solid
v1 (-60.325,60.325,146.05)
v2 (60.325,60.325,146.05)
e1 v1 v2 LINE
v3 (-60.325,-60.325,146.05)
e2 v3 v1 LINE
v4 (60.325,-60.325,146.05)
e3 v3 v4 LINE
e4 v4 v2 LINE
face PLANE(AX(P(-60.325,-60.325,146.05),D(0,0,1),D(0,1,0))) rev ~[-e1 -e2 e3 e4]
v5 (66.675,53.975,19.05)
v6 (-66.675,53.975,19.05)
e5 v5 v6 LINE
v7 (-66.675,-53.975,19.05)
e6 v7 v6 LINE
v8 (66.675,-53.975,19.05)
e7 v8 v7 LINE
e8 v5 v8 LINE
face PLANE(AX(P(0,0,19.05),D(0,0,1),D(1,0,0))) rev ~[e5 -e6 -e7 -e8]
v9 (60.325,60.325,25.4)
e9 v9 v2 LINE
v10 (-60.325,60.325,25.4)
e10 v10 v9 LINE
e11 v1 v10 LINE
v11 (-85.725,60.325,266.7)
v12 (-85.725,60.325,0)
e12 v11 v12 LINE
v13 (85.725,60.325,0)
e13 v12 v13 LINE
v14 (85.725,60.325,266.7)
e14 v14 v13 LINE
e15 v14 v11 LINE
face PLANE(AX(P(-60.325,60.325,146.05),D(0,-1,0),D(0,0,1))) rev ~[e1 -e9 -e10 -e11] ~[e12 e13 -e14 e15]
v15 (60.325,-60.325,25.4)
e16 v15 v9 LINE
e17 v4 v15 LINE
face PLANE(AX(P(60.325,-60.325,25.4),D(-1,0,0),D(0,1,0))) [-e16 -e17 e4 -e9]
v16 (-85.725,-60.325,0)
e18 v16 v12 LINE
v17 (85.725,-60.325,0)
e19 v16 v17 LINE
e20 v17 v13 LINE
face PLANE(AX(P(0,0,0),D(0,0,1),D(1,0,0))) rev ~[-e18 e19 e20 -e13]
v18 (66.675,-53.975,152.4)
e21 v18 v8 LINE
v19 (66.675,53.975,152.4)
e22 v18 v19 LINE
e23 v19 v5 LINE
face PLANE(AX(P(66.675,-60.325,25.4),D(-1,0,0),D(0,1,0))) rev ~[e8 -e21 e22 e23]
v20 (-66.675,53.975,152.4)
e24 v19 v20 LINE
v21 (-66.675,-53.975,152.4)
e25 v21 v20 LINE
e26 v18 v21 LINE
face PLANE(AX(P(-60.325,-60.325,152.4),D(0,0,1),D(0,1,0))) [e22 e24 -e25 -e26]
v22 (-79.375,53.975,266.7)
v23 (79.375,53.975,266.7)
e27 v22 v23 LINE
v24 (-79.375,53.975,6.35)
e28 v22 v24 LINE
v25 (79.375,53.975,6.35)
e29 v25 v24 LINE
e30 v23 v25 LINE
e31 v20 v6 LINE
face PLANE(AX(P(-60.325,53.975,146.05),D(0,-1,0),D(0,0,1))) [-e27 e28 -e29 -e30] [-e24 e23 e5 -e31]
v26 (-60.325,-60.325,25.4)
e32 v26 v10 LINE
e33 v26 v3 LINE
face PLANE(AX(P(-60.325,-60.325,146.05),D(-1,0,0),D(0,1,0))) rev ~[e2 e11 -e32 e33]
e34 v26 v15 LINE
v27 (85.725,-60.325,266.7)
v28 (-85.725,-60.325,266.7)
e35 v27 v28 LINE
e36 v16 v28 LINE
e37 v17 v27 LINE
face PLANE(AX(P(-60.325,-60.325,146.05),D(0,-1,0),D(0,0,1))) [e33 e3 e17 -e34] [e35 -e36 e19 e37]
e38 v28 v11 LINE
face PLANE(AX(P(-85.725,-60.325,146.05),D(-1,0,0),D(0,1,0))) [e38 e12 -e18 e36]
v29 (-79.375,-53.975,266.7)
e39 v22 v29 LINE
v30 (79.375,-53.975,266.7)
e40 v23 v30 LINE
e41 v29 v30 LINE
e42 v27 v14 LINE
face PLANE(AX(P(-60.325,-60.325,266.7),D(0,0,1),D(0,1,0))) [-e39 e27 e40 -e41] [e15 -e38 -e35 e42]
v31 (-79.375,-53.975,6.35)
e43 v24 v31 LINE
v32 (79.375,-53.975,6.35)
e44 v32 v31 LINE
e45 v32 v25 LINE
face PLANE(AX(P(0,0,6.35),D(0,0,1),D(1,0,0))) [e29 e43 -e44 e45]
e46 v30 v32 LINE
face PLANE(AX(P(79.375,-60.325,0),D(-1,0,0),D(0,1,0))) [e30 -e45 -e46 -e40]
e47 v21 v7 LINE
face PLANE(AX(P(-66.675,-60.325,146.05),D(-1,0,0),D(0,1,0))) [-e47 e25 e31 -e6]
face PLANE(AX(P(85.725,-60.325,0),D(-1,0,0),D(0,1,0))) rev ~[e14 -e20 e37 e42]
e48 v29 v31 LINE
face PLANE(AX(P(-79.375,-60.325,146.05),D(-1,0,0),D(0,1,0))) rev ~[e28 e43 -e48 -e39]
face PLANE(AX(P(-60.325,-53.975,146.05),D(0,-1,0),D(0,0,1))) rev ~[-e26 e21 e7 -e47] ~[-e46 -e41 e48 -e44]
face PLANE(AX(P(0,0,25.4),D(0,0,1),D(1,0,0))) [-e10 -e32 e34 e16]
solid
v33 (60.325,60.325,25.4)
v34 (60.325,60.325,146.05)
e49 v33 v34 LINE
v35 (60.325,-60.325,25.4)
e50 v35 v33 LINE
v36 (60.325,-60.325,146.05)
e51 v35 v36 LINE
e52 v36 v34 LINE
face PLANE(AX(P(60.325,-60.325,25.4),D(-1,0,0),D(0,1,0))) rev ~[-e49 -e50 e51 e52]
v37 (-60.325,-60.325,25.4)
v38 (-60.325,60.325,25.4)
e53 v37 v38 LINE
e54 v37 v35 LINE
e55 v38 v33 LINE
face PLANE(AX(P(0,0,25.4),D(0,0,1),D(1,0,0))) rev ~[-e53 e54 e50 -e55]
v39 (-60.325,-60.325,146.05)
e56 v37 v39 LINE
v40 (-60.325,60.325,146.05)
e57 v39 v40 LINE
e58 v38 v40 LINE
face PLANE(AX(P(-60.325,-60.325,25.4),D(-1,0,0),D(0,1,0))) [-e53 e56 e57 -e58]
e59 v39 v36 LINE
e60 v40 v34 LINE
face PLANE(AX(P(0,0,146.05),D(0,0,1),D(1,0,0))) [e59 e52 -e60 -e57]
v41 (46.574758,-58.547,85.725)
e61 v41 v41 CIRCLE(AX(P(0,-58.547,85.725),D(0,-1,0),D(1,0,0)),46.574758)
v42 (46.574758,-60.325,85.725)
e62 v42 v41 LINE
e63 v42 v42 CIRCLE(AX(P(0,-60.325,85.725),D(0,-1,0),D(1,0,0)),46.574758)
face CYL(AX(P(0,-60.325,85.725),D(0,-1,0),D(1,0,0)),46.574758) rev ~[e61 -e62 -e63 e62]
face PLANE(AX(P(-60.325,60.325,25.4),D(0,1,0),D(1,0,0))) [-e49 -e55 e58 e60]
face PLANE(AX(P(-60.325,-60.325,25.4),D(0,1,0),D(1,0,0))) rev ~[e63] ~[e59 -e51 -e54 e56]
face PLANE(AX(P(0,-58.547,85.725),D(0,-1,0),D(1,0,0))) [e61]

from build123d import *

# Parameters (mm, degrees)
F0_W      = 120.65
F0_H      = 120.65
F1_DEPTH  = 120.65
F2_R      = 46.5747584451
F3_DEPTH  = 1.778
F5_W      = 171.45
F5_H      = 120.65
F6_DEPTH  = 25.4
F7_W      = 25.4
F7_H      = 120.65
F8_DEPTH  = 120.65
F9_DEPTH  = 120.65
F10_W     = 120.65
F10_H     = 120.65
F11_DEPTH = 120.65
F12_T     = -6.35


with BuildPart() as f1:
    # F0 (on Top) → F1 (new body)
    with BuildSketch(Plane.XY):
        Rectangle(F0_W, F0_H)
    extrude(amount=F1_DEPTH)

    # F2 (on face) → F3 (cut)
    with BuildSketch(Plane.XZ.offset(60.325)):
        with Locations((0, 60.325)):
            Circle(F2_R)
    extrude(amount=-F3_DEPTH, mode=Mode.SUBTRACT)


with BuildPart() as f1_1:
    # F4: moved
    add(f1.part.moved(Location((0, 0, 25.4))))


with BuildPart() as f6:
    # F5 (on Top) → F6 (new body)
    with BuildSketch(Plane.XY):
        Rectangle(F5_W, F5_H)
    extrude(amount=F6_DEPTH)

    # F7 (on face) → F8 (join)
    with BuildSketch(Plane.XY.offset(25.4)):
        with Locations((-73.025, 0)):
            Rectangle(F7_W, F7_H)
        with Locations((73.025, 0)):
            Rectangle(F7_W, F7_H)
    extrude(amount=F8_DEPTH)

    # F9 (add): faces of the model
    f9_faces = [f6.faces().sort_by_distance(p)[0] for p in [
        (-73.025, 0, 146.05),
        (73.025, 0, 146.05),
    ]]
    extrude(f9_faces, amount=F9_DEPTH)

    # F10 (on face) → F11 (join)
    with BuildSketch(Plane.YZ.offset(-60.325)):
        with Locations((0, 206.375)):
            Rectangle(F10_W, F10_H)
    extrude(amount=F11_DEPTH)

    # F12
    f12_openings = [f6.faces().sort_by_distance(p)[0] for p in [
        (0, 0, 266.7),
    ]]
    offset(amount=F12_T, openings=f12_openings, kind=Kind.INTERSECTION)


solid = Compound([f1_1.part, f6.part])
